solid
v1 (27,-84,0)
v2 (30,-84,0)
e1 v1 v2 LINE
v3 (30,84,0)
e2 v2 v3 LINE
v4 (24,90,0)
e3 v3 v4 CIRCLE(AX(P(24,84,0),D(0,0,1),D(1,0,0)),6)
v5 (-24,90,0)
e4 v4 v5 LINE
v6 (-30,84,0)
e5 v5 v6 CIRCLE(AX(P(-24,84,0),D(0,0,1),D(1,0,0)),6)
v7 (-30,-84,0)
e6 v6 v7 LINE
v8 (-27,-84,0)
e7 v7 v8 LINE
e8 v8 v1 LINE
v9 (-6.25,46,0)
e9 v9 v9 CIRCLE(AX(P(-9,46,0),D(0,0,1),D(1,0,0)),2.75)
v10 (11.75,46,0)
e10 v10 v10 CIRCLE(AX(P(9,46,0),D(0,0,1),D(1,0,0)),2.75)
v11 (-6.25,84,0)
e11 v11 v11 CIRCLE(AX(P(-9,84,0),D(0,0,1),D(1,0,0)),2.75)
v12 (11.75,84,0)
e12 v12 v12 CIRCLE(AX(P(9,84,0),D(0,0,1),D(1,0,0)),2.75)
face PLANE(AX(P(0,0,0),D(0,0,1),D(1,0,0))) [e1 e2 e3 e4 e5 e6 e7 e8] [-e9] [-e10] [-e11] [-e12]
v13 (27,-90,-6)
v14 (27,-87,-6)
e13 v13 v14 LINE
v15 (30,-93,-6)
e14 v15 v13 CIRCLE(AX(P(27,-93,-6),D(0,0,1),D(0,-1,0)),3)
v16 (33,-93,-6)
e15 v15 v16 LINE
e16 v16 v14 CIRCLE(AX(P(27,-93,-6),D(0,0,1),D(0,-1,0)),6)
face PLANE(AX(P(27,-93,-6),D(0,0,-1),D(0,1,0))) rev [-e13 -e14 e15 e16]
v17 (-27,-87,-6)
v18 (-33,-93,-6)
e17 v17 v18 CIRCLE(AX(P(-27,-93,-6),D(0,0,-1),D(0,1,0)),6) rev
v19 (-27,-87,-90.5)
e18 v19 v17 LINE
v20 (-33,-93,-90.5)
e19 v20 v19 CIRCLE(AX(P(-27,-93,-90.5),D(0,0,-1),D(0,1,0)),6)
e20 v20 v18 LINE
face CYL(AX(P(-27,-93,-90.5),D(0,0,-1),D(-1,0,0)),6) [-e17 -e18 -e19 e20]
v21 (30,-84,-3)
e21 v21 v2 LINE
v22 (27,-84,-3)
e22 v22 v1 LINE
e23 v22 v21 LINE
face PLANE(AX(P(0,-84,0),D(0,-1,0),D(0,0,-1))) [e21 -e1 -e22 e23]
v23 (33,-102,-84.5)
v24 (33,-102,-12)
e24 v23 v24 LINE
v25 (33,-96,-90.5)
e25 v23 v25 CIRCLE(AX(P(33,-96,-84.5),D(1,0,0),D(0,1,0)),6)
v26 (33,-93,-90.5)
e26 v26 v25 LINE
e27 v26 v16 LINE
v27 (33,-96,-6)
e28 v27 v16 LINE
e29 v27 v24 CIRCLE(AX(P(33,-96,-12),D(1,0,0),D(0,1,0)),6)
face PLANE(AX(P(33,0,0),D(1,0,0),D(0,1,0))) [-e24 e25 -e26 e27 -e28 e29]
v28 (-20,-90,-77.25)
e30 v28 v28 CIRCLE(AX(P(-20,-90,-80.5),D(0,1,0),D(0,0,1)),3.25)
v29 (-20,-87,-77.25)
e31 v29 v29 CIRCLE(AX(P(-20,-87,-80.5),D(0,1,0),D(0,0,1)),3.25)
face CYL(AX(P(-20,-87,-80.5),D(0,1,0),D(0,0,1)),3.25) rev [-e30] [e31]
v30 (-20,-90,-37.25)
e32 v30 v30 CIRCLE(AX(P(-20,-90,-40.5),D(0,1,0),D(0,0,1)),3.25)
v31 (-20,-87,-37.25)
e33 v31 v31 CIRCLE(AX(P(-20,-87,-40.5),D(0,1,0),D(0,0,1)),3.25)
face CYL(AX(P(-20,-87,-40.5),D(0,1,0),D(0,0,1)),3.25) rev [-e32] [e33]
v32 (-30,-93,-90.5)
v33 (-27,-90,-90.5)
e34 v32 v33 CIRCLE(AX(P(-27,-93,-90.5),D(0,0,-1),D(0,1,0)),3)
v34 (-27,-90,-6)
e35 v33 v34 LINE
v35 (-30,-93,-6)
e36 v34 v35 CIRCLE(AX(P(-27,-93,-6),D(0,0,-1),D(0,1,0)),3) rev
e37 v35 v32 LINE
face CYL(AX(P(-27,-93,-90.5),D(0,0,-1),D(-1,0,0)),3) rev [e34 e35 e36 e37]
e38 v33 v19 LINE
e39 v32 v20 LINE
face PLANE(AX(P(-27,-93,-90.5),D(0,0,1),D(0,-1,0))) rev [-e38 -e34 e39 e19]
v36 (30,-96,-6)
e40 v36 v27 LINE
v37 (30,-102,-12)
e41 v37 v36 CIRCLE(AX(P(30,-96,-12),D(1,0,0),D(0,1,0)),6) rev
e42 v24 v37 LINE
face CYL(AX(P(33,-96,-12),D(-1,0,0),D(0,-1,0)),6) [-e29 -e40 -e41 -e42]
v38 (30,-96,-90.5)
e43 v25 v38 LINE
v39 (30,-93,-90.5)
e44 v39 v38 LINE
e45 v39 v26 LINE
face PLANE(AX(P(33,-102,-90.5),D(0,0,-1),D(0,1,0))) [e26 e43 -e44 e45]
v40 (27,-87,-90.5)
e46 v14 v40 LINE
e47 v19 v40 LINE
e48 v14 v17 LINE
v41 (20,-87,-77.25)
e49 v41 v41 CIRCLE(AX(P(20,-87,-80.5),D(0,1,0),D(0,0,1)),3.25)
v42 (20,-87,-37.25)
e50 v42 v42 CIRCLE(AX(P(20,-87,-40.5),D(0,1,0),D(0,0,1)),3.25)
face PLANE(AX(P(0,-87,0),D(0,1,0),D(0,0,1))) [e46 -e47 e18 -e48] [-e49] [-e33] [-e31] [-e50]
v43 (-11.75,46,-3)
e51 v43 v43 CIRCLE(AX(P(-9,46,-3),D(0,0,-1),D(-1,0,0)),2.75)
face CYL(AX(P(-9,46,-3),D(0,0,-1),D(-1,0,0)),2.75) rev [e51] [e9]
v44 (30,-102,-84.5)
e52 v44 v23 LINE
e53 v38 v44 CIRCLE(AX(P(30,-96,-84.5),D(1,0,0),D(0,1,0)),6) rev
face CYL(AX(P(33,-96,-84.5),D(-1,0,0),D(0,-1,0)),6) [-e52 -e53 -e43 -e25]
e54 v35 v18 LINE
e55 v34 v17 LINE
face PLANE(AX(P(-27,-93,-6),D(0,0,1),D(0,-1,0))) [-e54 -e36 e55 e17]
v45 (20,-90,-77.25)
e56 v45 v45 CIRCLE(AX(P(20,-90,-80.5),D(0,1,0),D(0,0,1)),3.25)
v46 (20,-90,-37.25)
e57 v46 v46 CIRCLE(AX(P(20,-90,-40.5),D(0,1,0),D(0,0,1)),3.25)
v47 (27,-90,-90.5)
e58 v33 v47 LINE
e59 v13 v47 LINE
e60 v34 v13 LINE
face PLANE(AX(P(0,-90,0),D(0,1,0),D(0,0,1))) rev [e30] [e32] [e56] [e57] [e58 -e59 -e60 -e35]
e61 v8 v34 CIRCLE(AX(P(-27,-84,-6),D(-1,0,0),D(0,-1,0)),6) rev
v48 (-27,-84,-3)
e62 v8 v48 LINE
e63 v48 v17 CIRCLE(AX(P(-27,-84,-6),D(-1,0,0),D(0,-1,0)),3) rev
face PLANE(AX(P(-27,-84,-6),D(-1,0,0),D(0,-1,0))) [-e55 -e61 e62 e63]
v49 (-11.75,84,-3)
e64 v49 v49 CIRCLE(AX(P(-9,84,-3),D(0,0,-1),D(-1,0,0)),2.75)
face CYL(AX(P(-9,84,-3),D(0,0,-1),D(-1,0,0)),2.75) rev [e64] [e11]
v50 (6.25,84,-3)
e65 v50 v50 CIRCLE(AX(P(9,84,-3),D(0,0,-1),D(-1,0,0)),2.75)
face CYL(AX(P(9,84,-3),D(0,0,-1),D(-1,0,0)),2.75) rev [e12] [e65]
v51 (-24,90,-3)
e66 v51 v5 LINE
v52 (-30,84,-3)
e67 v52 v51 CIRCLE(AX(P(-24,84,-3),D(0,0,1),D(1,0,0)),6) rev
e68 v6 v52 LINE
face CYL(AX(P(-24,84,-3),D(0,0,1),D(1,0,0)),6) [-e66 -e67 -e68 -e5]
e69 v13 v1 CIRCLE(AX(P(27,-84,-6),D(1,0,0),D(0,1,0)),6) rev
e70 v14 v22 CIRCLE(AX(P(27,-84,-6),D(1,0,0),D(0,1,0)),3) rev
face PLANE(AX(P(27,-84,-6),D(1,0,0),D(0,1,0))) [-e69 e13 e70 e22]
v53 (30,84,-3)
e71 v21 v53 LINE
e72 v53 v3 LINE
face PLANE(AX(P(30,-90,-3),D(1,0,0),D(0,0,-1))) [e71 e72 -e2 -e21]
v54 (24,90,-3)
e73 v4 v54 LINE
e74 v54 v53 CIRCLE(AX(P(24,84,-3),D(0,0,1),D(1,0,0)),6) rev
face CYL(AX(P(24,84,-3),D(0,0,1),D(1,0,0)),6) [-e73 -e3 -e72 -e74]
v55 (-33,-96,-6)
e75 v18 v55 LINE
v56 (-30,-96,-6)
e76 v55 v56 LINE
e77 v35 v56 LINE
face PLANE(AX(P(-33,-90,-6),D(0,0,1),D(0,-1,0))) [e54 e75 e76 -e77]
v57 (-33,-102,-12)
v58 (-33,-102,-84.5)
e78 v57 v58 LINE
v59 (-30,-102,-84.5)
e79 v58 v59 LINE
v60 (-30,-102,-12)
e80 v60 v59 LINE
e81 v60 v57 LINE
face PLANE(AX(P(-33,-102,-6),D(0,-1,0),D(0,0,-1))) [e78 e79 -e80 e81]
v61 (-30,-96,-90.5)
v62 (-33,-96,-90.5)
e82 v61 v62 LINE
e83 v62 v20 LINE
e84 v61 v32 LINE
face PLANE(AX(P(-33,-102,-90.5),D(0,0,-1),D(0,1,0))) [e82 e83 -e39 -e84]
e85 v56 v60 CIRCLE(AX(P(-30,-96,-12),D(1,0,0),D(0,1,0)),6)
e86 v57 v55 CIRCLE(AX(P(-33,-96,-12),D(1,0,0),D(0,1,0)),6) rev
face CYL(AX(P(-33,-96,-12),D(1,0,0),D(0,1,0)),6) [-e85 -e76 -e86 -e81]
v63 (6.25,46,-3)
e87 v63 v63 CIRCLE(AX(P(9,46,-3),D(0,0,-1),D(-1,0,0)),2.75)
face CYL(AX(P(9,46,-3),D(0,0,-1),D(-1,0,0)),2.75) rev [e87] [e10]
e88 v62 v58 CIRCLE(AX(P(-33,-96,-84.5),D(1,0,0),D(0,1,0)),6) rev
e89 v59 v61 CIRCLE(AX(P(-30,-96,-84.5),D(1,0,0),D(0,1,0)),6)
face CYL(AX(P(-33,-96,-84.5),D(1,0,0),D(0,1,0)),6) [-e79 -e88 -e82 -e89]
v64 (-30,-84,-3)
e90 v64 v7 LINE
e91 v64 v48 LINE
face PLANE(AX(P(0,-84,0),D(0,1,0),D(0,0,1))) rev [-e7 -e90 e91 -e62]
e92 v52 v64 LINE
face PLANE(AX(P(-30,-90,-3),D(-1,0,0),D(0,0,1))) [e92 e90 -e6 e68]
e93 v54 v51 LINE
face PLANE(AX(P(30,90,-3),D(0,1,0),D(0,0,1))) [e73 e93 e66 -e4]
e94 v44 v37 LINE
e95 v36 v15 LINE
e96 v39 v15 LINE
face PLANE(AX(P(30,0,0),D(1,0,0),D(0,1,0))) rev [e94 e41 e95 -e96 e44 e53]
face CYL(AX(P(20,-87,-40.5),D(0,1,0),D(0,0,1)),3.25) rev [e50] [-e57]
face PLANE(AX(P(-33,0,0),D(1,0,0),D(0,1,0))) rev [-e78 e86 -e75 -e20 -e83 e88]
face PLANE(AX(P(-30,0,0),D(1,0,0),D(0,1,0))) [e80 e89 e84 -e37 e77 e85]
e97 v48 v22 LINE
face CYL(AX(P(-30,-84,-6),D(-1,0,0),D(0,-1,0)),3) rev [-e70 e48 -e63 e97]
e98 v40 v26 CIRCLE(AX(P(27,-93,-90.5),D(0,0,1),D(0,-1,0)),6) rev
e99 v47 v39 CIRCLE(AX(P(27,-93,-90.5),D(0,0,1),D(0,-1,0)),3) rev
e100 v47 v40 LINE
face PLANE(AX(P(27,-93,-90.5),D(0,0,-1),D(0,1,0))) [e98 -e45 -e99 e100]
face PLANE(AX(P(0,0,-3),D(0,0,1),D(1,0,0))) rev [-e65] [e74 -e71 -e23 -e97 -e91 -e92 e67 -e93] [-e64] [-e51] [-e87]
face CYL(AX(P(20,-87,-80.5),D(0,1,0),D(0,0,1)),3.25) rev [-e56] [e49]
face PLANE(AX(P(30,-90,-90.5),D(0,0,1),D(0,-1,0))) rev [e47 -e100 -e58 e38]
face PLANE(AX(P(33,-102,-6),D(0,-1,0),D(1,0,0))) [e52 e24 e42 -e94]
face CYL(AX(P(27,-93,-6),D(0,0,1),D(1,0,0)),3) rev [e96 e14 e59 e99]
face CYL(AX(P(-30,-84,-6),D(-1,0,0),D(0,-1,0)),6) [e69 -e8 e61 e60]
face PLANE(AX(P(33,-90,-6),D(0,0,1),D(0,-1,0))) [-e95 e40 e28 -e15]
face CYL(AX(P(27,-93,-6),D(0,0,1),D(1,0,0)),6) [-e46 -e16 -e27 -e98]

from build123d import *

# Parameters (mm, degrees)
SKIZZE1_W                        = 60
SKIZZE1_H                        = 180
BASIS_BLECH1_DEPTH               = 3
KANTE_LASCHE1_STRIP_W            = 18
KANTE_LASCHE1_STRIP_H            = 3
KANTE_LASCHE1_STRIP_CUT_DEPTH    = 60
KANTE_LASCHE1_DEPTH              = 60
KANTE_LASCHE2_START              = -90.5
KANTE_LASCHE2_DEPTH              = 90.5
KANTE_LASCHE2_START_2            = -6
KANTE_LASCHE2_2_DEPTH            = 6
KANTE_LASCHE2_3_DEPTH            = 84.5
ECKE_START                       = -33
ECKE_BRECHEN1_DEPTH              = 66
ECKE_START_2                     = -3
ECKE_BRECHEN1_2_DEPTH            = 3
F_6_5_6_5_DURCHMESSER_BOHRUNG1_D = 6.5
F_5_5_5_5_DURCHMESSER_BOHRUNG1_D = 5.5


# Read off the part's stored shape, not the designer's step: Kante-Lasche2, Ecke brechen1
# Sheet-metal steps are written as plain solids
with BuildPart() as part:
    # Skizze1 → Basis-Blech1 (new body)
    with BuildSketch(Plane.XY):
        Rectangle(SKIZZE1_W, SKIZZE1_H)
    extrude(amount=-BASIS_BLECH1_DEPTH)

    # Kante-Lasche1 strip (across the edge) → Kante-Lasche1 strip cut (cut)
    with BuildSketch(Plane(origin=(30, -90, -3), x_dir=(0, 1, 0), z_dir=(-1, 0, 0))):
        with Locations((-3, -1.5)):
            Rectangle(KANTE_LASCHE1_STRIP_W, KANTE_LASCHE1_STRIP_H)
    extrude(amount=KANTE_LASCHE1_STRIP_CUT_DEPTH, mode=Mode.SUBTRACT)

    # Kante-Lasche1 section (across the edge) → Kante-Lasche1 (add)
    with BuildSketch(Plane(origin=(30, -90, -3), x_dir=(0, 1, 0), z_dir=(-1, 0, 0))):
        with BuildLine():
            Line((0, 3), (0, 87.5))
            Line((0, 87.5), (3, 87.5))
            Line((3, 87.5), (3, 3))
            ThreePointArc((3, 3), (3.878679656, 0.878679656), (6, 0))
            Line((6, 0), (6, -3))
            ThreePointArc((6, -3), (1.757359313, -1.242640687), (0, 3))
        make_face()
    extrude(amount=KANTE_LASCHE1_DEPTH)

    # Kante-Lasche2 outline → Kante-Lasche2 (cut)
    with BuildSketch(Plane.XY.offset(KANTE_LASCHE2_START)):
        with BuildLine():
            Line((-27, -87), (-27, -84))
            Line((-27, -84), (-30, -84))
            Line((-30, -84), (-30, -87.803847577))
            ThreePointArc((-30, -87.803847577), (-28.552914271, -87.204445042), (-27, -87))
        make_face()
        with BuildLine():
            Line((30, -84), (27, -84))
            Line((27, -84), (27, -87))
            ThreePointArc((27, -87), (28.552914271, -87.204445042), (30, -87.803847577))
            Line((30, -87.803847577), (30, -84))
        make_face()
    extrude(amount=KANTE_LASCHE2_DEPTH, mode=Mode.SUBTRACT)

    # Kante-Lasche2 2 outline → Kante-Lasche2 2 (cut)
    with BuildSketch(Plane.XY.offset(KANTE_LASCHE2_START_2)):
        with BuildLine():
            Line((-27, -90), (-27, -87))
            ThreePointArc((-27, -87), (-28.552914271, -87.204445042), (-30, -87.803847577))
            ThreePointArc((-30, -87.803847577), (-32.196152423, -90), (-33, -93))
            Line((-33, -93), (-33, -102))
            Line((-33, -102), (-30, -102))
            Line((-30, -102), (-30, -93))
            ThreePointArc((-30, -93), (-29.121320344, -90.878679656), (-27, -90))
        make_face()
        with BuildLine():
            ThreePointArc((30, -87.803847577), (28.552914271, -87.204445042), (27, -87))
            Line((27, -87), (27, -90))
            ThreePointArc((27, -90), (29.121320344, -90.878679656), (30, -93))
            Line((30, -93), (30, -102))
            Line((30, -102), (33, -102))
            Line((33, -102), (33, -93))
            ThreePointArc((33, -93), (32.196152423, -90), (30, -87.803847577))
        make_face()
    extrude(amount=KANTE_LASCHE2_2_DEPTH, mode=Mode.SUBTRACT)

    # Kante-Lasche2 3 outline → Kante-Lasche2 3 (add)
    with BuildSketch(Plane.XY.offset(KANTE_LASCHE2_START)):
        with BuildLine():
            Line((-27, -90), (-27, -87))
            ThreePointArc((-27, -87), (-28.552914271, -87.204445042), (-30, -87.803847577))
            ThreePointArc((-30, -87.803847577), (-32.196152423, -90), (-33, -93))
            Line((-33, -93), (-33, -102))
            Line((-33, -102), (-30, -102))
            Line((-30, -102), (-30, -93))
            ThreePointArc((-30, -93), (-29.121320344, -90.878679656), (-27, -90))
        make_face()
        with BuildLine():
            ThreePointArc((30, -87.803847577), (28.552914271, -87.204445042), (27, -87))
            Line((27, -87), (27, -90))
            ThreePointArc((27, -90), (29.121320344, -90.878679656), (30, -93))
            Line((30, -93), (30, -102))
            Line((30, -102), (33, -102))
            Line((33, -102), (33, -93))
            ThreePointArc((33, -93), (32.196152423, -90), (30, -87.803847577))
        make_face()
    extrude(amount=KANTE_LASCHE2_3_DEPTH)

    # Ecke brechen1 outline → Ecke brechen1 (cut)
    with BuildSketch(Plane.YZ.offset(ECKE_START)):
        with BuildLine():
            ThreePointArc((-96, -90.5), (-100.242640687, -88.742640687), (-102, -84.5))
            Line((-102, -84.5), (-102, -90.5))
            Line((-102, -90.5), (-96, -90.5))
        make_face()
        with BuildLine():
            ThreePointArc((-102, -12), (-100.242640687, -7.757359313), (-96, -6))
            Line((-96, -6), (-102, -6))
            Line((-102, -6), (-102, -12))
        make_face()
    extrude(amount=ECKE_BRECHEN1_DEPTH, mode=Mode.SUBTRACT)

    # Ecke brechen1 2 outline → Ecke brechen1 2 (cut)
    with BuildSketch(Plane.XY.offset(ECKE_START_2)):
        with BuildLine():
            Line((30, 90), (24, 90))
            ThreePointArc((24, 90), (28.242640687, 88.242640687), (30, 84))
            Line((30, 84), (30, 90))
        make_face()
        with BuildLine():
            ThreePointArc((-30, 84), (-28.242640687, 88.242640687), (-24, 90))
            Line((-24, 90), (-30, 90))
            Line((-30, 90), (-30, 84))
        make_face()
    extrude(amount=ECKE_BRECHEN1_2_DEPTH, mode=Mode.SUBTRACT)

    # Ø6.5 (6.5) Durchmesser Bohrung1 (through all)
    with Locations(Plane(origin=(0, -87, 0), x_dir=(1, 0, 0), z_dir=(0, 1, 0))):
        with Locations((-20, 80.5), (20, 80.5), (-20, 40.5), (20, 40.5)):
            Hole(F_6_5_6_5_DURCHMESSER_BOHRUNG1_D / 2)

    # Ø5.5 (5.5) Durchmesser Bohrung1 (through all)
    with Locations(Plane(origin=(0, 0, -3), x_dir=(-1, 0, 0), z_dir=(0, 0, -1))):
        with Locations((-9, 84), (9, 84), (-9, 46), (9, 46)):
            Hole(F_5_5_5_5_DURCHMESSER_BOHRUNG1_D / 2)


solid = part.part
